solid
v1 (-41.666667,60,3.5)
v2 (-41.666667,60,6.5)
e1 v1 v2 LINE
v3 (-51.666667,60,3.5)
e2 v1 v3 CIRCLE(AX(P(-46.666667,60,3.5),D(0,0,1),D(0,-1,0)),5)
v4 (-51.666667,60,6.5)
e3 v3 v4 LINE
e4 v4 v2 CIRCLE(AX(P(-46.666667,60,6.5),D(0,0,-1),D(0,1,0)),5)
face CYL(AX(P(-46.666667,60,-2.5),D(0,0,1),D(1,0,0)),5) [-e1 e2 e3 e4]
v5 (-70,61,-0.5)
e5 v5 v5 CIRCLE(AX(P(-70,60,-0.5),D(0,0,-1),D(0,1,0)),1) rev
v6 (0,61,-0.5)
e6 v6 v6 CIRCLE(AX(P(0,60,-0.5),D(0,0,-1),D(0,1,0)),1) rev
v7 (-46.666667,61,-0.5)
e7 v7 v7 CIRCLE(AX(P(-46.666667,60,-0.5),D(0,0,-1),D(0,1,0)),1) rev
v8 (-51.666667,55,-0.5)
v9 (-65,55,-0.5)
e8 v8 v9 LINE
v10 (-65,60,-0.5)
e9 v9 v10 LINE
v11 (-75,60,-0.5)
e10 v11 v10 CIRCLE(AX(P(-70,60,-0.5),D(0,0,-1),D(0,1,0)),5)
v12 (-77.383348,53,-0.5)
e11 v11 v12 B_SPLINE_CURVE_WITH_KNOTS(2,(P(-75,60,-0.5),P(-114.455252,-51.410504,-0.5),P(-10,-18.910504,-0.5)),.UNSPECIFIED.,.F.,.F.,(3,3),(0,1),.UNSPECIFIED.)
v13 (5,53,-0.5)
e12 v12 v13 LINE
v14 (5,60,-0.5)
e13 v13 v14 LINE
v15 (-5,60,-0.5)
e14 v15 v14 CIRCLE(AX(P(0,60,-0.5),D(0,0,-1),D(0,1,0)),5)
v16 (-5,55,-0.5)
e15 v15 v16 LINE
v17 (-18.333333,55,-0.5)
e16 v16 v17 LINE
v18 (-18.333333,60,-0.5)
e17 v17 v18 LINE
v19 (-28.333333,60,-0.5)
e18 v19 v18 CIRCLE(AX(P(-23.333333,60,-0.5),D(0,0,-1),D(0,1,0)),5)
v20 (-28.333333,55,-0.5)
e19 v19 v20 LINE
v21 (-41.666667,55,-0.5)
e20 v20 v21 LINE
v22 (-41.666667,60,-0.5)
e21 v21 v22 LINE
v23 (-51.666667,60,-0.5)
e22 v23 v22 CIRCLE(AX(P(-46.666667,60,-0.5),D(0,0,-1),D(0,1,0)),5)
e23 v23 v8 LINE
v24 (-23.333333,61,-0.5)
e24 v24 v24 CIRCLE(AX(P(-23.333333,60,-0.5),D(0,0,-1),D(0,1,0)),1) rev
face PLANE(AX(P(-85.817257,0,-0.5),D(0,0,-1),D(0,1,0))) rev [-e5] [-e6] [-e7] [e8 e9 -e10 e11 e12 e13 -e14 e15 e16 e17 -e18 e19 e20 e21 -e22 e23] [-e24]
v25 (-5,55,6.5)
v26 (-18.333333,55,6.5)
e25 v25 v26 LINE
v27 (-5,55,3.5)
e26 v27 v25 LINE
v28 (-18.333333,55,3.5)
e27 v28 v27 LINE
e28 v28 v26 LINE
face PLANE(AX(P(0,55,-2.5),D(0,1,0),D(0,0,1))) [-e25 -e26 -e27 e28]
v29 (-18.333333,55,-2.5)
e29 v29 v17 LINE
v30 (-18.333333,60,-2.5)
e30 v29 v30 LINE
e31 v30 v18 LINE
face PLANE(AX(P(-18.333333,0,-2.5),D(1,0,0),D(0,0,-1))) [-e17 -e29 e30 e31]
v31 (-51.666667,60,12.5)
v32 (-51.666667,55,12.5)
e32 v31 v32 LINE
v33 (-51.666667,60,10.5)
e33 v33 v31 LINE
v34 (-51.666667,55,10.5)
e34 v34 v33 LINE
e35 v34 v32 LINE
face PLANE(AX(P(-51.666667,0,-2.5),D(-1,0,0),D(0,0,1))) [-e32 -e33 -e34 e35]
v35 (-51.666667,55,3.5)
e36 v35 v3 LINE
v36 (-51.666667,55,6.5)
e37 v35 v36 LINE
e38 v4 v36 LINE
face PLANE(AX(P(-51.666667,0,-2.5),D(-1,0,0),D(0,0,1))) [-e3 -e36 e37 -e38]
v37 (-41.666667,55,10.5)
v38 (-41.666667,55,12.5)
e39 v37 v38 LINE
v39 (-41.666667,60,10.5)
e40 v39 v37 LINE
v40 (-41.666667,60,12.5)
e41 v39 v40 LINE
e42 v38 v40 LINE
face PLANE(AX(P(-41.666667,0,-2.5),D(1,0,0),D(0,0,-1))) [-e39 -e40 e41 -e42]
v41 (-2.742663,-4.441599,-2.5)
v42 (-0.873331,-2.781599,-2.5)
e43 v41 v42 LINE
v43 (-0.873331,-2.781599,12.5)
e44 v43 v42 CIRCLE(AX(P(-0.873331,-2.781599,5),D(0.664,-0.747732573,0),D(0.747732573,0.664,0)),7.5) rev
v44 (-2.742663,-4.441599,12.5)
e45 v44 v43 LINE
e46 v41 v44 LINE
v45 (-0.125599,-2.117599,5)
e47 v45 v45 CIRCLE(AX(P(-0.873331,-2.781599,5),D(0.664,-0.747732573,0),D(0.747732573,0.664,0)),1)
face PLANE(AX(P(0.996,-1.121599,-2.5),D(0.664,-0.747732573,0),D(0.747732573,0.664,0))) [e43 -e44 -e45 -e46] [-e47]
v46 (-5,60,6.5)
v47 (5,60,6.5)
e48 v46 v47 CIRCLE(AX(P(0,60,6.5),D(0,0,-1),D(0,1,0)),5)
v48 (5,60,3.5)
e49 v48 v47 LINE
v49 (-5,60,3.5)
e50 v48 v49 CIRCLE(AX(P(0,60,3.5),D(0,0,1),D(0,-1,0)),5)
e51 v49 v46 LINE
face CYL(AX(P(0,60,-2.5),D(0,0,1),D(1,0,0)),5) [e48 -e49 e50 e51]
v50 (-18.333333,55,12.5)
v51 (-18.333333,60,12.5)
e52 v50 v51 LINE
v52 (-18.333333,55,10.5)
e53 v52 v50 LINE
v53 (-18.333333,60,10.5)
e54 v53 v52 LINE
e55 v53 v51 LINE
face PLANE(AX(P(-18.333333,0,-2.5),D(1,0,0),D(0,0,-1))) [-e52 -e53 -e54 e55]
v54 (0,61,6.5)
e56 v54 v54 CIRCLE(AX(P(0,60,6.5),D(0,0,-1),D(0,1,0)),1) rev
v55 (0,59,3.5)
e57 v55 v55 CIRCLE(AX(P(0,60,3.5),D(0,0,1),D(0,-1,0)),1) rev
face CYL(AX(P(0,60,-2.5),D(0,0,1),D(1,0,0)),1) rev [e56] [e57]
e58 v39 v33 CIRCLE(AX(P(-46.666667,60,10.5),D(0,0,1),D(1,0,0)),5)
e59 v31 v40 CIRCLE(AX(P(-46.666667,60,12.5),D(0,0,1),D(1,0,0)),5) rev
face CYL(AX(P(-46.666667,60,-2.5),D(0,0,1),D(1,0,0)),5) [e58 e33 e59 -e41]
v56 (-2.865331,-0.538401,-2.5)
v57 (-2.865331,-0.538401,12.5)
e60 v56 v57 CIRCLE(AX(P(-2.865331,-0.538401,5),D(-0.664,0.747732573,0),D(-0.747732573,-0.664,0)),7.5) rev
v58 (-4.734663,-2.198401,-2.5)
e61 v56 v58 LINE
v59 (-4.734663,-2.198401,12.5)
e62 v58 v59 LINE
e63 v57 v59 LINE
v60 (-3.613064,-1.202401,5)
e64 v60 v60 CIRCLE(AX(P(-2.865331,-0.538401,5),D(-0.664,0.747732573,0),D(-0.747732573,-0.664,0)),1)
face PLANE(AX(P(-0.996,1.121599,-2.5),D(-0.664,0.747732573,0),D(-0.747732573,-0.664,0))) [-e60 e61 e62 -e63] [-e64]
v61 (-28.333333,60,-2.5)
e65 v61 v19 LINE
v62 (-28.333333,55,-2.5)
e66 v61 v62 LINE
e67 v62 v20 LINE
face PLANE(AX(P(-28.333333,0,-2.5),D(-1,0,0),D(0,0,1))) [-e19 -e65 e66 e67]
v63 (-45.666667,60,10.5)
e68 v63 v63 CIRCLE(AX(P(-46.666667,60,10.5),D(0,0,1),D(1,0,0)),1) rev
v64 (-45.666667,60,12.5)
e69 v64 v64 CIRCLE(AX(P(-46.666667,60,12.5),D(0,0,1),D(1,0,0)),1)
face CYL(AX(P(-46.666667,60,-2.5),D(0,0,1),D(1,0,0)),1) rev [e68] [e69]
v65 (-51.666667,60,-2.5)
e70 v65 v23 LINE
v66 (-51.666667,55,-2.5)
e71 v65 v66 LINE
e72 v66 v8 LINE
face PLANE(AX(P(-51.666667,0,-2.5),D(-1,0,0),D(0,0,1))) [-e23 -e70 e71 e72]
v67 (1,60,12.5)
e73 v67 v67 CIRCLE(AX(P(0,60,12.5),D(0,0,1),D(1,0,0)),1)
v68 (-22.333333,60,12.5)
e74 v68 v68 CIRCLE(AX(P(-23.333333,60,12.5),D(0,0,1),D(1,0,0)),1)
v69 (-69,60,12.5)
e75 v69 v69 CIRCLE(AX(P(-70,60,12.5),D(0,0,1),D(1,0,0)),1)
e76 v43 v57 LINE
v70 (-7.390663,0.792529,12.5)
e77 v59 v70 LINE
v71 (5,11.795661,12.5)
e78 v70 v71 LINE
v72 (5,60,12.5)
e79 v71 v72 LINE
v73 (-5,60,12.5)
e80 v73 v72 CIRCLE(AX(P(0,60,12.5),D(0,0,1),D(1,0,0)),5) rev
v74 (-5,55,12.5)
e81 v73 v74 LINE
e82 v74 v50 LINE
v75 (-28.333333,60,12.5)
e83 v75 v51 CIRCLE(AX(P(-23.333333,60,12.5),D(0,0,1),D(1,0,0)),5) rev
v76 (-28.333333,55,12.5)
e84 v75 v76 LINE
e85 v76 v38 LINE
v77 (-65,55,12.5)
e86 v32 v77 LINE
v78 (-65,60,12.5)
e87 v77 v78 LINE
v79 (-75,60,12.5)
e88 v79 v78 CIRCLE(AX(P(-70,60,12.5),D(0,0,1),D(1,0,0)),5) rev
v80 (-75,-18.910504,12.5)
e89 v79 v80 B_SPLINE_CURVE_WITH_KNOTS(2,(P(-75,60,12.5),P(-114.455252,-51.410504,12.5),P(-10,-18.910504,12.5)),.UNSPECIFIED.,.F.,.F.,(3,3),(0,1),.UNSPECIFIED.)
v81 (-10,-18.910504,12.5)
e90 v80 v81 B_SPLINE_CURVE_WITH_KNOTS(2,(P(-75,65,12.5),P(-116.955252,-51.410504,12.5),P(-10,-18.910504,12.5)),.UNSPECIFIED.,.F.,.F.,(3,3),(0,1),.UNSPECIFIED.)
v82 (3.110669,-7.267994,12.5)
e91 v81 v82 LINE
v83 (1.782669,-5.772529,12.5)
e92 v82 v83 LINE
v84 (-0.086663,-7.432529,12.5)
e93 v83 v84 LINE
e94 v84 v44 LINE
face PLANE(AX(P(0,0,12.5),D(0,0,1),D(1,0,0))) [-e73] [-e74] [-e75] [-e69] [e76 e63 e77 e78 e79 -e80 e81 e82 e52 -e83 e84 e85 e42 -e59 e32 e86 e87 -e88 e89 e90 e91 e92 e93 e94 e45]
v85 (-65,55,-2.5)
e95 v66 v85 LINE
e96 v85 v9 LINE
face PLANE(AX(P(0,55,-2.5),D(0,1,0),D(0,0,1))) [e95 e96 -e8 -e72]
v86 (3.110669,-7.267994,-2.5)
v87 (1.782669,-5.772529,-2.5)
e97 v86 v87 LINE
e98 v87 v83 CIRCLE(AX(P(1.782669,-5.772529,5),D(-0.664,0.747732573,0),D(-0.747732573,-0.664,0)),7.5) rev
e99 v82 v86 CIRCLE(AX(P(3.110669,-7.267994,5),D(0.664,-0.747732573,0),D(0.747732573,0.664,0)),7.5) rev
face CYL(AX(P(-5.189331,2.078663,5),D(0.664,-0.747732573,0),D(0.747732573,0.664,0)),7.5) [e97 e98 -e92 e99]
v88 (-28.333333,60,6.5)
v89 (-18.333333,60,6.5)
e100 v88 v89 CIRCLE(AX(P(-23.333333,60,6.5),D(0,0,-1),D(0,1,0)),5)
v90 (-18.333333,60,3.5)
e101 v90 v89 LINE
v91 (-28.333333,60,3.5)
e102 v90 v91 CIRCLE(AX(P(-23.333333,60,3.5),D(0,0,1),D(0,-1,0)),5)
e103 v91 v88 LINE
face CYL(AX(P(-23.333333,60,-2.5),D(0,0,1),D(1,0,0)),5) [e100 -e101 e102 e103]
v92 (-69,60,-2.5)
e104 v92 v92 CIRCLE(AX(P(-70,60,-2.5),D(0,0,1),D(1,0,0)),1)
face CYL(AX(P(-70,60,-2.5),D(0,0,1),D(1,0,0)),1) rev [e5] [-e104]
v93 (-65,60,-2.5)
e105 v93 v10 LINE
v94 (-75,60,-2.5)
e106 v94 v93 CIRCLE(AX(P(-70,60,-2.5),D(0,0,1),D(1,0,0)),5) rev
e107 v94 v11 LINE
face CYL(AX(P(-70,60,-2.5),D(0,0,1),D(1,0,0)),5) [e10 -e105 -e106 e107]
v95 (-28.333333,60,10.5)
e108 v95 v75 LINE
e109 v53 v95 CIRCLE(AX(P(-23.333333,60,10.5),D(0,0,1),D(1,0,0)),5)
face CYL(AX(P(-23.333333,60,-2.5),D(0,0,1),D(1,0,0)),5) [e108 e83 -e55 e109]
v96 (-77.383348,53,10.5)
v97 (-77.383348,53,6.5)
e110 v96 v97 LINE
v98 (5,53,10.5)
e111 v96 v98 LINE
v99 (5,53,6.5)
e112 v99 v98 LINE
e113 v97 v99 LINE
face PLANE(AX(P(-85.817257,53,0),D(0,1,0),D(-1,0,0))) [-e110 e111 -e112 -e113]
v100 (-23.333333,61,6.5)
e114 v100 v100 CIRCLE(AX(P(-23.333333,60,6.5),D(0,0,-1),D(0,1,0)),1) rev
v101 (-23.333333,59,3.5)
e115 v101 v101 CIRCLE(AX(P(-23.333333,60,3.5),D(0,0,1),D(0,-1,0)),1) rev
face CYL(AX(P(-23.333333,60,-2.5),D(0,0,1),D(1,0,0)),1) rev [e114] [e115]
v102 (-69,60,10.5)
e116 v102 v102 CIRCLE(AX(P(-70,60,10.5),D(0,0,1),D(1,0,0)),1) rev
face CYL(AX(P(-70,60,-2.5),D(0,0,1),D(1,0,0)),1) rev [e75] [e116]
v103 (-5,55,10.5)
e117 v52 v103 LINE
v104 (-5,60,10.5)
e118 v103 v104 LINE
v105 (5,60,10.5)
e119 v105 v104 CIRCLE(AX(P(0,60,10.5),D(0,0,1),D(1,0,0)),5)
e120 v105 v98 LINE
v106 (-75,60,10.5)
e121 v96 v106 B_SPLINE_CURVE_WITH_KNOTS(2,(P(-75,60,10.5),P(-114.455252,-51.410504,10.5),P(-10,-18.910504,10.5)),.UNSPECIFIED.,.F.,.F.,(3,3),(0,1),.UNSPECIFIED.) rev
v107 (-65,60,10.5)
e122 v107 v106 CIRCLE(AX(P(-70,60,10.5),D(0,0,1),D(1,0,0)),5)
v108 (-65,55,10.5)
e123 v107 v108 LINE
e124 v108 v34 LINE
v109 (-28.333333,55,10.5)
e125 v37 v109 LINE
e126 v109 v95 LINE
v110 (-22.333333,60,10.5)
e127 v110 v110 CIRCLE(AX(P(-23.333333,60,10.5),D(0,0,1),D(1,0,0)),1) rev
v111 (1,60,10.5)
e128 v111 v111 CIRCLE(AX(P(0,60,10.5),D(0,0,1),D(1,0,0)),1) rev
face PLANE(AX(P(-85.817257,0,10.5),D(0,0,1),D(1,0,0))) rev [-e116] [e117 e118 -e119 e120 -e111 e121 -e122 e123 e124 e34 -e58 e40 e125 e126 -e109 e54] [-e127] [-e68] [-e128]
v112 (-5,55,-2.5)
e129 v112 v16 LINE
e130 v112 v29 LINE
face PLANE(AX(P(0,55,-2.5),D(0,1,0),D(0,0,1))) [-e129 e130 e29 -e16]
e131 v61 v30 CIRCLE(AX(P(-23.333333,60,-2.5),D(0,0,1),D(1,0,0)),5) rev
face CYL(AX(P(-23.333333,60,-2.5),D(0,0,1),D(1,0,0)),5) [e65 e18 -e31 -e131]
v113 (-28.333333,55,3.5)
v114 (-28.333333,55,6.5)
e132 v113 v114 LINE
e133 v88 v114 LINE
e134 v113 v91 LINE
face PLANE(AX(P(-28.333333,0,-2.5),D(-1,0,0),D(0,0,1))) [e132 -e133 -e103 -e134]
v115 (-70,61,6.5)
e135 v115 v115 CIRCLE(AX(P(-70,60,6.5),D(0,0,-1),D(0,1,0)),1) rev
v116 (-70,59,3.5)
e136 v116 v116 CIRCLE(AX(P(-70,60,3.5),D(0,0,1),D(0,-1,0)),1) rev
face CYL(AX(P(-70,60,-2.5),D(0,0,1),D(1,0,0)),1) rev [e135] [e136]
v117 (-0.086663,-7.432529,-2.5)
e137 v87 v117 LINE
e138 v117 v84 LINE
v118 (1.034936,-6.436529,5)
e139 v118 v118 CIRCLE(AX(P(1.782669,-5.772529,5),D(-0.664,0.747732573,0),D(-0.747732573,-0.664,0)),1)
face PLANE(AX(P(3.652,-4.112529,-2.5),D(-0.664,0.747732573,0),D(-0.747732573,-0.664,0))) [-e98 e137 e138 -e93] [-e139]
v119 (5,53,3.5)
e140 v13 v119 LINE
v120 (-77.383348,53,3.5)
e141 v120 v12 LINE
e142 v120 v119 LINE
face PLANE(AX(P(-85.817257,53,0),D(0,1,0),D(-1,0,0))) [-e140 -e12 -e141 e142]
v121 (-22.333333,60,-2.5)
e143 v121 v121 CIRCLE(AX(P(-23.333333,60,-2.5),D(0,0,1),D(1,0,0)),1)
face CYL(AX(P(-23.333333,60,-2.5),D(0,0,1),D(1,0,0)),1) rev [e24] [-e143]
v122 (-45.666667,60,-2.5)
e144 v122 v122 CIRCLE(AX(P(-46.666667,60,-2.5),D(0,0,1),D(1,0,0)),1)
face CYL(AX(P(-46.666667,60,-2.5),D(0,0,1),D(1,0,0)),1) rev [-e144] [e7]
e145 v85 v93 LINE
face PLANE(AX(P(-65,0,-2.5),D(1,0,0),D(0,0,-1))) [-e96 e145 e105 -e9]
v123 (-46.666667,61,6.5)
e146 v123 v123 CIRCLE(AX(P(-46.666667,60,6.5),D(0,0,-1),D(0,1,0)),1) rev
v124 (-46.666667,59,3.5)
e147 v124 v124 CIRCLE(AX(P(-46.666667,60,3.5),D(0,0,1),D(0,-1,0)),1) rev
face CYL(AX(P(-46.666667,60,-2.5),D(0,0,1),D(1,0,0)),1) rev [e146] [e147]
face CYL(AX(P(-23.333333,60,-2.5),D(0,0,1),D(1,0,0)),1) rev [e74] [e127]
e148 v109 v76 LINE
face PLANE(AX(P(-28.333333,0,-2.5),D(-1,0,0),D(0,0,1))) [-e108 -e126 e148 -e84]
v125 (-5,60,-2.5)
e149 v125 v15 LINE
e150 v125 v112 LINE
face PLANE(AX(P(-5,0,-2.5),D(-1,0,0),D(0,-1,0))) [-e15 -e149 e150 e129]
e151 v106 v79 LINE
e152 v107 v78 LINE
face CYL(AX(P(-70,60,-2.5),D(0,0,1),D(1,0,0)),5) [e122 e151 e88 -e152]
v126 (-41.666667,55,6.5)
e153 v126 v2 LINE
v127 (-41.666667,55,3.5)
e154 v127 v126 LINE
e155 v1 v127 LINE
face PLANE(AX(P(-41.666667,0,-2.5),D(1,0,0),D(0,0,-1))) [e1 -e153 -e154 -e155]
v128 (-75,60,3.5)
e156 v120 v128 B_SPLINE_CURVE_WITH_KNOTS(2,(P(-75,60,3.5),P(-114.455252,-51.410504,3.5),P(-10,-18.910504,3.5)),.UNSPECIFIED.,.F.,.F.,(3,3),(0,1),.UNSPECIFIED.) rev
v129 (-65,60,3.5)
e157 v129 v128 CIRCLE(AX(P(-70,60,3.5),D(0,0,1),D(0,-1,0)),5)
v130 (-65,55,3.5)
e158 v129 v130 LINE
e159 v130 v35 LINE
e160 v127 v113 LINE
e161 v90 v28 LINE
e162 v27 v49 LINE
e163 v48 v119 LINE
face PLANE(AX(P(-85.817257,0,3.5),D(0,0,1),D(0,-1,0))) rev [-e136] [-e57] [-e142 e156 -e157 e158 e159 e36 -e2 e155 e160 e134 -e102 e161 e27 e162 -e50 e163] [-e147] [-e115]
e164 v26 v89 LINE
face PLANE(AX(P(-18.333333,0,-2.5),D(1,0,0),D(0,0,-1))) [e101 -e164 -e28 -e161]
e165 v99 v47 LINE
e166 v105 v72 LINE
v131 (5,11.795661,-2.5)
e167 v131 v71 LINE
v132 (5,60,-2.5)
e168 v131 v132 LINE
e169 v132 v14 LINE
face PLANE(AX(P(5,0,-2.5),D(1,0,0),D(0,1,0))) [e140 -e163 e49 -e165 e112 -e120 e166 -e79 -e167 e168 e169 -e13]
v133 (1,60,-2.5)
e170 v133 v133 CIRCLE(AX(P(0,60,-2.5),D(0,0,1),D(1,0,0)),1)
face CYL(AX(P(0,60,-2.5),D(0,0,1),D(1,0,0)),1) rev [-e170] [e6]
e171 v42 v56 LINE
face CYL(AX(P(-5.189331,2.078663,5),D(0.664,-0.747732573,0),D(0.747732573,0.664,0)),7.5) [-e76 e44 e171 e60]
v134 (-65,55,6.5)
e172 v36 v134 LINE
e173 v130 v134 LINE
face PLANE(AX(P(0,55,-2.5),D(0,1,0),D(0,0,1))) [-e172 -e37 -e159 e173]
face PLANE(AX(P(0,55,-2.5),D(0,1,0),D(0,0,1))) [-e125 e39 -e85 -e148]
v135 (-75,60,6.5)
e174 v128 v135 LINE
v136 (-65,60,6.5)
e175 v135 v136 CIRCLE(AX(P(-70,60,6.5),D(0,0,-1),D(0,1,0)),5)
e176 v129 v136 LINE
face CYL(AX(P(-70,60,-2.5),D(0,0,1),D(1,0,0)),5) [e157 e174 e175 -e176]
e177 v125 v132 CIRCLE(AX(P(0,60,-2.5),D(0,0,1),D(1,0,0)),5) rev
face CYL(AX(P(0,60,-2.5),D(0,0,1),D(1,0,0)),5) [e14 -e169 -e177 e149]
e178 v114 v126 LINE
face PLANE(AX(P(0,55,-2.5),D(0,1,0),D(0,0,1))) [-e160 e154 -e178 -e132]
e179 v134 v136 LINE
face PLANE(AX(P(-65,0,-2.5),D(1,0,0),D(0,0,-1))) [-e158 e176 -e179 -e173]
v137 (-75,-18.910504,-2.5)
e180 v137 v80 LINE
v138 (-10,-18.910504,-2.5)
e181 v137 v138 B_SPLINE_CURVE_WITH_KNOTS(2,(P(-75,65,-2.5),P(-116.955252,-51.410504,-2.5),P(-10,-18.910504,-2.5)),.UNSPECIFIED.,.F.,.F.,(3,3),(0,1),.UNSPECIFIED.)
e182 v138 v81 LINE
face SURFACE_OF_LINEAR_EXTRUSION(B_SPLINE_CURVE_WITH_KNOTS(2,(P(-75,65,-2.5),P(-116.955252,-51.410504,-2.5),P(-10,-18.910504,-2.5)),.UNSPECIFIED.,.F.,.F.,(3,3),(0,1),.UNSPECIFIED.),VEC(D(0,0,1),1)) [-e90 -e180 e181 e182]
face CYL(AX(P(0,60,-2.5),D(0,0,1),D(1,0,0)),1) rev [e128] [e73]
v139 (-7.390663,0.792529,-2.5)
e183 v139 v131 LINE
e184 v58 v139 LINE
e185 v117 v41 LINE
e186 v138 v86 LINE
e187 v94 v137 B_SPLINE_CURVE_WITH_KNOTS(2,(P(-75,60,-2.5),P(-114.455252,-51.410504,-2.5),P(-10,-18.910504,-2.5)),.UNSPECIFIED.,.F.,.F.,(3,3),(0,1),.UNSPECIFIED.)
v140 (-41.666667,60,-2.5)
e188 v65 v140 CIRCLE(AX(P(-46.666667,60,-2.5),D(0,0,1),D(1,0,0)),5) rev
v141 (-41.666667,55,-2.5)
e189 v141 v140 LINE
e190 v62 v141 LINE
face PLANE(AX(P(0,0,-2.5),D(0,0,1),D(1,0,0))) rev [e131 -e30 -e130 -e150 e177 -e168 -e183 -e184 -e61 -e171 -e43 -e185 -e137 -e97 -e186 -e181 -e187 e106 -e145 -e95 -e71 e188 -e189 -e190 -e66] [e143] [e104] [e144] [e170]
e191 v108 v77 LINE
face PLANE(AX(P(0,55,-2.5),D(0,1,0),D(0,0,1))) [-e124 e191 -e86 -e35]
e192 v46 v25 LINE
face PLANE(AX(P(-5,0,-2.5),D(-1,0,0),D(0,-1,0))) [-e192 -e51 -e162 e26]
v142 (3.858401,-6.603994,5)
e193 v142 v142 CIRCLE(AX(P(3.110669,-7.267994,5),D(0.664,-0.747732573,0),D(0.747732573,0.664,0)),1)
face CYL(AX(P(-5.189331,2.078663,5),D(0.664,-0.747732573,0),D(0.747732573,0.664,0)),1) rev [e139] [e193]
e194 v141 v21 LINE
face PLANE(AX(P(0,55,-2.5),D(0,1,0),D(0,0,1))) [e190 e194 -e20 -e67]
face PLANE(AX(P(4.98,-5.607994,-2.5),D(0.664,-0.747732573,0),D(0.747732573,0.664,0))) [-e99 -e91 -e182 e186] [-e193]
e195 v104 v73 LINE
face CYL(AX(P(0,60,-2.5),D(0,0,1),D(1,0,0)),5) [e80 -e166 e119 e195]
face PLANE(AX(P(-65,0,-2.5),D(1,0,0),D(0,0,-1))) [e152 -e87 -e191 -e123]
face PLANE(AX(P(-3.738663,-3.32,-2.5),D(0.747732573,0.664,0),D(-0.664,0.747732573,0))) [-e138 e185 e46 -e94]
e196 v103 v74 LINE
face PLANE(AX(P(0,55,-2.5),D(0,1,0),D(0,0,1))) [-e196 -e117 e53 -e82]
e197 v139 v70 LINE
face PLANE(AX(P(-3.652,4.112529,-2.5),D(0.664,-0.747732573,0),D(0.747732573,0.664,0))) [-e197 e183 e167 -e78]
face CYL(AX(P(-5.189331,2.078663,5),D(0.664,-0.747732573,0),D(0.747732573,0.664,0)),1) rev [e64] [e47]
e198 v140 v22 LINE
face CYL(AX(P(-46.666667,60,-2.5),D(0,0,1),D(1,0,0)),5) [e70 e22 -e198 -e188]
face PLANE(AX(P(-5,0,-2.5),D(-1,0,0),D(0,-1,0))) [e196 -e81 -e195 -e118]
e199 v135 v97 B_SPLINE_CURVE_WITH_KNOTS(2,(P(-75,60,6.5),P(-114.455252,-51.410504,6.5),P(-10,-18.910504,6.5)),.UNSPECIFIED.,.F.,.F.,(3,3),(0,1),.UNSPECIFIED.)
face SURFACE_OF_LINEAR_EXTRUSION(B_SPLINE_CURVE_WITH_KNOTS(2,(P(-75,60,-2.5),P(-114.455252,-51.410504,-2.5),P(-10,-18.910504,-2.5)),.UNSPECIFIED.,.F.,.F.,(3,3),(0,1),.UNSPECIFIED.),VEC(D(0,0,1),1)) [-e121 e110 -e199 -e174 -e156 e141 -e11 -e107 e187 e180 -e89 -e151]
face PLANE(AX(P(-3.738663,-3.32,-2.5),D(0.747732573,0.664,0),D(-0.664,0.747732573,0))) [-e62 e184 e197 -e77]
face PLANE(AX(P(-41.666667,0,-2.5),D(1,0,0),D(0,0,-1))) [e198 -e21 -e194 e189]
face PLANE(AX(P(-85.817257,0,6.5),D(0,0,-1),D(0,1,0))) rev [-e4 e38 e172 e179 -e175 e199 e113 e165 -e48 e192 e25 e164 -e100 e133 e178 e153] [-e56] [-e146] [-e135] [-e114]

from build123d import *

# Parameters (mm, degrees)
BOSS_EXTRU_1_DEPTH      = 12.5
BOSS_EXTRU_1_DEPTH_BACK = 2.5
ESQUISSE1_R             = 1
ESQUISSE2_W             = 4
ESQUISSE2_H             = 12
ENL_V_MAT_EXTRU_1_DEPTH = 113.378931374
ESQUISSE3_R             = 1
ENL_V_MAT_EXTRU_2_DEPTH = 12.5


with BuildPart() as part:
    # Esquisse1 → Boss.-Extru.1 (new, two sides: drawn at the far end of the back side and taken through both)
    with BuildSketch(Plane.XY.offset(-BOSS_EXTRU_1_DEPTH_BACK)):
        with BuildLine():
            add(Edge.make_bspline(
                [(-75, -18.910504263), (-56.686373288, -33.096877551), (-10, -18.910504263)],
                knots=[0.563496207, 0.563496207, 0.563496207, 1, 1, 1], degree=2))
            Line((-10, -18.910504263), (8.718662863, -2.287994294))
            Line((8.718662863, -2.287994294), (7.390662863, -0.792529149))
            Line((7.390662863, -0.792529149), (-0.086662863, -7.432529149))
            Line((-0.086662863, -7.432529149), (-2.742662863, -4.441598859))
            Line((-2.742662863, -4.441598859), (4.734662863, 2.198401141))
            Line((4.734662863, 2.198401141), (2.742662863, 4.441598859))
            Line((2.742662863, 4.441598859), (-4.734662863, -2.198401141))
            Line((-4.734662863, -2.198401141), (-7.390662863, 0.792529149))
            Line((-7.390662863, 0.792529149), (5, 11.795661075))
            Line((5, 11.795661075), (5, 60))
            ThreePointArc((5, 60), (0, 65), (-5, 60))
            Line((-5, 60), (-5, 55))
            Line((-5, 55), (-18.333333333, 55))
            Line((-18.333333333, 55), (-18.333333333, 60))
            ThreePointArc((-18.333333333, 60), (-23.333333333, 65), (-28.333333333, 60))
            Line((-28.333333333, 60), (-28.333333333, 55))
            Line((-28.333333333, 55), (-41.666666667, 55))
            Line((-41.666666667, 55), (-41.666666667, 60))
            ThreePointArc((-41.666666667, 60), (-46.666666667, 65), (-51.666666667, 60))
            Line((-51.666666667, 60), (-51.666666667, 55))
            Line((-51.666666667, 55), (-65, 55))
            Line((-65, 55), (-65, 60))
            ThreePointArc((-65, 60), (-70, 65), (-75, 60))
            add(Edge.make_bspline(
                [(-75, 60), (-96.634514155, -1.089766286), (-75, -18.910504263)],
                knots=[0, 0, 0, 0.548330399, 0.548330399, 0.548330399], degree=2))
        make_face()
        with Locations((-70, 60)):
            Circle(ESQUISSE1_R, mode=Mode.SUBTRACT)
        with Locations((-46.666666667, 60)):
            Circle(ESQUISSE1_R, mode=Mode.SUBTRACT)
        with Locations((-23.333333333, 60)):
            Circle(ESQUISSE1_R, mode=Mode.SUBTRACT)
        with Locations((0, 60)):
            Circle(ESQUISSE1_R, mode=Mode.SUBTRACT)
    extrude(amount=BOSS_EXTRU_1_DEPTH + BOSS_EXTRU_1_DEPTH_BACK)

    # Esquisse2 → Enlèv. mat.-Extru.1 (cut, through all)
    with BuildSketch(Plane(origin=(5, 0, 0), x_dir=(0, 0, -1), z_dir=(1, 0, 0))):
        with Locations((-8.5, 59)):
            Rectangle(ESQUISSE2_W, ESQUISSE2_H)
        with Locations((-1.5, 59)):
            Rectangle(ESQUISSE2_W, ESQUISSE2_H)
    extrude(amount=-ENL_V_MAT_EXTRU_1_DEPTH, mode=Mode.SUBTRACT)

    # Esquisse3 → Enlèv. mat.-Extru.2 (cut)
    with BuildSketch(Plane(origin=(4.98, -5.607994294, 0), x_dir=(0.7477325725150671, 0.6640000000000001, 0), z_dir=(0.6640000000000001, -0.7477325725150671, 0))):
        with BuildLine():
            Line((5, 12.5), (-2.5, 12.5))
            ThreePointArc((-2.5, 12.5), (2.803300859, 10.303300859), (5, 5))
            Line((5, 5), (5, 12.5))
        make_face()
        with Locations((-2.5, 5)):
            Circle(ESQUISSE3_R)
        with BuildLine():
            Line((5, -2.5), (5, 5))
            ThreePointArc((5, 5), (2.803300859, -0.303300859), (-2.5, -2.5))
            Line((-2.5, -2.5), (5, -2.5))
        make_face()
    extrude(amount=-ENL_V_MAT_EXTRU_2_DEPTH, mode=Mode.SUBTRACT)


solid = part.part
